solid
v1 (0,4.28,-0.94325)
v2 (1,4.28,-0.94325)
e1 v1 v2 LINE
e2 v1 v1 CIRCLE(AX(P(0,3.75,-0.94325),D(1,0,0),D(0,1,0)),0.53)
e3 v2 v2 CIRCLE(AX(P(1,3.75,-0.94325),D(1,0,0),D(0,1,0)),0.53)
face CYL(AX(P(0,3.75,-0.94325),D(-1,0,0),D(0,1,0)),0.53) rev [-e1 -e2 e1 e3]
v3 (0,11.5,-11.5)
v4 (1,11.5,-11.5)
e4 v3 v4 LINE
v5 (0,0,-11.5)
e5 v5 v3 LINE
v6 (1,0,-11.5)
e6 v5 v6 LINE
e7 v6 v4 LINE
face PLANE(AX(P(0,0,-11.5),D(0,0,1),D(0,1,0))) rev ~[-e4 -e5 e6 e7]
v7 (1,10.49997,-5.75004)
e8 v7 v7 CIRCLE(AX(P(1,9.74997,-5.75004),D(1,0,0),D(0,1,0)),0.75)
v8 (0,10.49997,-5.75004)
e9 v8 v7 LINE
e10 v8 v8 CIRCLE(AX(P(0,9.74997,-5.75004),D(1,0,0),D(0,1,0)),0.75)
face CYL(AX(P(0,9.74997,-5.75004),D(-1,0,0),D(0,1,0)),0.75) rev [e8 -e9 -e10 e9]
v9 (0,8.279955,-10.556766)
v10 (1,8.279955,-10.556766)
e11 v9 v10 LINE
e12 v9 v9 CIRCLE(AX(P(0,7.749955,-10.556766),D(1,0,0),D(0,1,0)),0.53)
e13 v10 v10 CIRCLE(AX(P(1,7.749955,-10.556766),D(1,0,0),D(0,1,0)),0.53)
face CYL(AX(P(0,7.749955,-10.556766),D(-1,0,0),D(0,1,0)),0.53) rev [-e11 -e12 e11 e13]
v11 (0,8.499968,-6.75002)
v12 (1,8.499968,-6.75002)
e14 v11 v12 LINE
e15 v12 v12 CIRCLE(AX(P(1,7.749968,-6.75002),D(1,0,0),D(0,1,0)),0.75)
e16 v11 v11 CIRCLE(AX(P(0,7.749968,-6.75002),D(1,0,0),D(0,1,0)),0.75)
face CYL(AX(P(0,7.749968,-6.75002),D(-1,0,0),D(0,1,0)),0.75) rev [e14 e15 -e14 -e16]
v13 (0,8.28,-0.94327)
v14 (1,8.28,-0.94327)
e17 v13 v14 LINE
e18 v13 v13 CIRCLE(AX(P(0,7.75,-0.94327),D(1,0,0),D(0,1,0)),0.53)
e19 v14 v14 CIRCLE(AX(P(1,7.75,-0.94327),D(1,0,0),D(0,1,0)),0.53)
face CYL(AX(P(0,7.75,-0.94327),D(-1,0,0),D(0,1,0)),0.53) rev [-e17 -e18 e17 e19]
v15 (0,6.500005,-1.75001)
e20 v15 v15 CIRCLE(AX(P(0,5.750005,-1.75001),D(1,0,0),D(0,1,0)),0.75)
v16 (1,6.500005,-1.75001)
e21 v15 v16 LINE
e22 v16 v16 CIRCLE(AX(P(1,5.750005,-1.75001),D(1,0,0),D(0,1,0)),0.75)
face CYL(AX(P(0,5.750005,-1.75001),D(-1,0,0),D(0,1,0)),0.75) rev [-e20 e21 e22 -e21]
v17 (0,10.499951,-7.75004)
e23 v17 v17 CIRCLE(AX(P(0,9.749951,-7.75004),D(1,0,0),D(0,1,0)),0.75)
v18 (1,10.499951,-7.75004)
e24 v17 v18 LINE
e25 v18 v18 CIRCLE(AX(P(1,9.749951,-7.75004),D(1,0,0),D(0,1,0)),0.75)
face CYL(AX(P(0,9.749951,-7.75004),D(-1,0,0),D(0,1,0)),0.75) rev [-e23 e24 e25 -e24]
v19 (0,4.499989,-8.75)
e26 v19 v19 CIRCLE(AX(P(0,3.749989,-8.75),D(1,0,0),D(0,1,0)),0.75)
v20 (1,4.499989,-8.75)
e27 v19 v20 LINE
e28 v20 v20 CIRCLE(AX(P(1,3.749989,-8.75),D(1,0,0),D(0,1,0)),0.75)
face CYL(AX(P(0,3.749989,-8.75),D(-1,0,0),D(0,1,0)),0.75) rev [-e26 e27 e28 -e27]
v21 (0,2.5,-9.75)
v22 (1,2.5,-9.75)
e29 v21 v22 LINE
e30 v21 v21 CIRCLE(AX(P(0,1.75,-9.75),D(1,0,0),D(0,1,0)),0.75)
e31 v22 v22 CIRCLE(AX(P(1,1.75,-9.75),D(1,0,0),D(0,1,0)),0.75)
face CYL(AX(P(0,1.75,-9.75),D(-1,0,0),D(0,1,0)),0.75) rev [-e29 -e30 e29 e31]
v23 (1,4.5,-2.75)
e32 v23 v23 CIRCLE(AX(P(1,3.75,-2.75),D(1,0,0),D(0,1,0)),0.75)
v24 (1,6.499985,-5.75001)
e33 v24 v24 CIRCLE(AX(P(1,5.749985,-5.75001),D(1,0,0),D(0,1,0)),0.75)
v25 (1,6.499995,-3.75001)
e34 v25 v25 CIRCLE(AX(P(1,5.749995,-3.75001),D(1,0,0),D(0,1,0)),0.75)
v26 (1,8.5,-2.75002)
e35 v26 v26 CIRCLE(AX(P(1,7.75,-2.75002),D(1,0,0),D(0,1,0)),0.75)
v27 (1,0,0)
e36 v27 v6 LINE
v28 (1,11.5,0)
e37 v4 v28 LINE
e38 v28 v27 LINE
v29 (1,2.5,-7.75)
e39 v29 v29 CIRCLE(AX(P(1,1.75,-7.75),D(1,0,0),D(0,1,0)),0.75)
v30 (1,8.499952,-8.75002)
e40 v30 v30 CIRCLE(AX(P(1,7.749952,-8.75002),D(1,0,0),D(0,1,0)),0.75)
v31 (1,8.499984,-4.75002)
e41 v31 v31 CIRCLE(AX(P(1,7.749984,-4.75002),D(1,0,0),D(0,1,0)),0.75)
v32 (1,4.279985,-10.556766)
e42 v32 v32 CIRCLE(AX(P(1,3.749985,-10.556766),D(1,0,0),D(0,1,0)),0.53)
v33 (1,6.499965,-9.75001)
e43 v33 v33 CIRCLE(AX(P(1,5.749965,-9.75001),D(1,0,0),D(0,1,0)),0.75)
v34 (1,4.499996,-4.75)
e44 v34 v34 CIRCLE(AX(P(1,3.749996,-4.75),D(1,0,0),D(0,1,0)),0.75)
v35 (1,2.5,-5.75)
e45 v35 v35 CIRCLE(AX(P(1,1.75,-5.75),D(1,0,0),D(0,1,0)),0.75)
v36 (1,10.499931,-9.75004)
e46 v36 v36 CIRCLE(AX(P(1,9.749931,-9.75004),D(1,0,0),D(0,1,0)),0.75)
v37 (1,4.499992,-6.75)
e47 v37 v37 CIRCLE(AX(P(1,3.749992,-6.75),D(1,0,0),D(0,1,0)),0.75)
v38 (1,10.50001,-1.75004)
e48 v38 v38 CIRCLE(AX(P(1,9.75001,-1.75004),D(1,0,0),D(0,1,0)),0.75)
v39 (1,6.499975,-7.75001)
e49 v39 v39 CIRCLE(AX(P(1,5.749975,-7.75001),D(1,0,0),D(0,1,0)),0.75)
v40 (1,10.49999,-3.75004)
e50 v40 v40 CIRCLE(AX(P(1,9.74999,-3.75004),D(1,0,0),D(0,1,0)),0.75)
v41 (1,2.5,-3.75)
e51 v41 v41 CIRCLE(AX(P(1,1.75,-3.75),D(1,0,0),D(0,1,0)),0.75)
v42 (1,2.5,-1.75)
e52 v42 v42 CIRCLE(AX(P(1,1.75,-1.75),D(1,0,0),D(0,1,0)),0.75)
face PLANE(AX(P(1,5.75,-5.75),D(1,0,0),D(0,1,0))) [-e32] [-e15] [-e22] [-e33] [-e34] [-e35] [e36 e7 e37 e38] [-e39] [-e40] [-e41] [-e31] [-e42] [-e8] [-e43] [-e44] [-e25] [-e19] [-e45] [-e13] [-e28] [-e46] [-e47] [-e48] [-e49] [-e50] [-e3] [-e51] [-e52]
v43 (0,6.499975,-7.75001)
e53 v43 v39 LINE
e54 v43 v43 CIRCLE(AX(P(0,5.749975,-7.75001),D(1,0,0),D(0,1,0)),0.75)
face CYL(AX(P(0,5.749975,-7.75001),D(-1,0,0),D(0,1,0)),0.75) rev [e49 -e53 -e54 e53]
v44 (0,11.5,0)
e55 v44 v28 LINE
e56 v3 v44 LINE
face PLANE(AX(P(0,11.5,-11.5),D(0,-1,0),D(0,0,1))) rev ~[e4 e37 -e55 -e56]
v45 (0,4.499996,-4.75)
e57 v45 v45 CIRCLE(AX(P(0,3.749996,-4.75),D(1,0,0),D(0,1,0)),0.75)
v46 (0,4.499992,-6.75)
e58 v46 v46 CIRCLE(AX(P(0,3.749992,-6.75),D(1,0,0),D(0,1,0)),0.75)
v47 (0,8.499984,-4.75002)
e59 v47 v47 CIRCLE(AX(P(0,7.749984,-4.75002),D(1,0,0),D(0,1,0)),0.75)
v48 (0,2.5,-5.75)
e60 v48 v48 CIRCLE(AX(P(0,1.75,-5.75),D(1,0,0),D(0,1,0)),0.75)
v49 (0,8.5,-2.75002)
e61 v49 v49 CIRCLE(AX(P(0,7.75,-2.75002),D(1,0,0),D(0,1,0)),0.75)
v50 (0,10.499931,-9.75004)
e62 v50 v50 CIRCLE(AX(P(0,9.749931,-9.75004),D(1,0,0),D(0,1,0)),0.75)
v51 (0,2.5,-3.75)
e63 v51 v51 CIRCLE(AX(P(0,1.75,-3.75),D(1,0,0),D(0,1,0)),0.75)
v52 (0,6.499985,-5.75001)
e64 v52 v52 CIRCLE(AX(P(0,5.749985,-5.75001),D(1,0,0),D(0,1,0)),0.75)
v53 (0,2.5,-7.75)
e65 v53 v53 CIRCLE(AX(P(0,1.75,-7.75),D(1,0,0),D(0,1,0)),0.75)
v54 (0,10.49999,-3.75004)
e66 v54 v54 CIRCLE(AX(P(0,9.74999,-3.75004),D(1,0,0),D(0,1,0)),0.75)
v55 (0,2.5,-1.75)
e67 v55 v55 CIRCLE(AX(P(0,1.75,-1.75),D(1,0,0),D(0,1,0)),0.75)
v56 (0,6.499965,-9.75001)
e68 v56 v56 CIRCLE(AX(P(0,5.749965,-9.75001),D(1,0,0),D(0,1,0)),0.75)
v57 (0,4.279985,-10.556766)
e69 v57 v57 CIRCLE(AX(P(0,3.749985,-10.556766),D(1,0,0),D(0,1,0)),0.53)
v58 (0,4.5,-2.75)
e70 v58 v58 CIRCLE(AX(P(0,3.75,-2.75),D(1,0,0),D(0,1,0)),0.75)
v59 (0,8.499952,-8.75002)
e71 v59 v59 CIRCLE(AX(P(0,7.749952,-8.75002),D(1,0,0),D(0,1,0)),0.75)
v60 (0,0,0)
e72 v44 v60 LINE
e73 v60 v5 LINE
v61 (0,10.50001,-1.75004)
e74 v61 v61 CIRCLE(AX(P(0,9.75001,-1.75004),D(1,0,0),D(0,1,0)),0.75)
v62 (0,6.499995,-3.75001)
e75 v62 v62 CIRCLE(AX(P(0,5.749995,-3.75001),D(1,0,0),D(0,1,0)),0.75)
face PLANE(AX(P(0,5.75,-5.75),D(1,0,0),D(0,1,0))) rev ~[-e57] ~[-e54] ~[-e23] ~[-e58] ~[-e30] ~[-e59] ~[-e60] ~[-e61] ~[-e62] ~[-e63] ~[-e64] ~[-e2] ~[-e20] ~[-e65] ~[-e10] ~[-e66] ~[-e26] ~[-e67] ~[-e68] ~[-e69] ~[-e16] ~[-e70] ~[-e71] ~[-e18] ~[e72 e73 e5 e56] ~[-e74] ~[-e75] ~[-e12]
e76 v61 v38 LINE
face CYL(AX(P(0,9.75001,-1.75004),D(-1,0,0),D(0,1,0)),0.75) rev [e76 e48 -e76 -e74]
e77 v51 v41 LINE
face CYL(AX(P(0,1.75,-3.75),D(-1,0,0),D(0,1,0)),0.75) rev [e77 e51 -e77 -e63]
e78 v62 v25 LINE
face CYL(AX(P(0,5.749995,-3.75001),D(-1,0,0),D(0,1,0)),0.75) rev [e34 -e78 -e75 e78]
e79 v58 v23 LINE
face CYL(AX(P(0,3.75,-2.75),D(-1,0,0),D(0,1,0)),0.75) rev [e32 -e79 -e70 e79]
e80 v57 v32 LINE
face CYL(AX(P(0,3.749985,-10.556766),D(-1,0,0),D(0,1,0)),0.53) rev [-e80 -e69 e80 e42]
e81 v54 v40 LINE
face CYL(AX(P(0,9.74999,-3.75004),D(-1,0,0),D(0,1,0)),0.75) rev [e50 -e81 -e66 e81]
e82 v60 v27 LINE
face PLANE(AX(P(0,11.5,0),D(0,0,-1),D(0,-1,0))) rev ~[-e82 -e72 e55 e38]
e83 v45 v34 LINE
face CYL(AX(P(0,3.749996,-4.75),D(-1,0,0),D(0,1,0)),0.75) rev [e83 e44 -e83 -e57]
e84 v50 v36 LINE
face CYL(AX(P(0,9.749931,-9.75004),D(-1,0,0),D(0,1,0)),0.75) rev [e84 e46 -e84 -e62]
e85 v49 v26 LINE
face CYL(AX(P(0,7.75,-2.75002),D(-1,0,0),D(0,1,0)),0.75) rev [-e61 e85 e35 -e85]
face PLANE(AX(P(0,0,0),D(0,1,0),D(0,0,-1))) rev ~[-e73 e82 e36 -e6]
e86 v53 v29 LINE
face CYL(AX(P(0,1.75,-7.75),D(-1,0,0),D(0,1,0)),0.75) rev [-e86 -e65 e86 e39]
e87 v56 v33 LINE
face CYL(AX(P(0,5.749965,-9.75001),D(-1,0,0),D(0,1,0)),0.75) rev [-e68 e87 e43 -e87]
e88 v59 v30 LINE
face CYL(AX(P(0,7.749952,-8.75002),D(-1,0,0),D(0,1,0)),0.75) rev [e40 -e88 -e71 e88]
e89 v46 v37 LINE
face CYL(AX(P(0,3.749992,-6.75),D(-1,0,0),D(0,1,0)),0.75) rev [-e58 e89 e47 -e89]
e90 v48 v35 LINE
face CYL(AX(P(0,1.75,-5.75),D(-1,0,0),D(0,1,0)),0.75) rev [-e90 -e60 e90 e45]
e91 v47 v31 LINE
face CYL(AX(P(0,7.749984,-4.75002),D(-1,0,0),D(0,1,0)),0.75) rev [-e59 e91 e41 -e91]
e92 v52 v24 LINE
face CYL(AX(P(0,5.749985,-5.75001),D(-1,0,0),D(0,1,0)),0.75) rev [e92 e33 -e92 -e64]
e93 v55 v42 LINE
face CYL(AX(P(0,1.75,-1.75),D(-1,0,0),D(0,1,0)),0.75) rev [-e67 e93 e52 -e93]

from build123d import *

# Parameters (mm, degrees)
F0_R     = 0.75
F0_R_2   = 0.53
F1_DEPTH = 1


# Not quite as in the source:
# - a feature names something its author has since deleted; it is built from what else it names


with BuildPart() as f1:
    # F0 (on Right) → F1 (new body)
    with BuildSketch(Plane.YZ):
        Polygon((8.384144865, 0), (0, 0), (0, -11.5), (11.5, -11.5), (11.5, 0), (10.384144865, 0), align=None)
        with Locations((1.7500000088, -9.75)):
            Circle(F0_R, mode=Mode.SUBTRACT)
        with Locations((1.75, -7.75)):
            Circle(F0_R, mode=Mode.SUBTRACT)
        with Locations((3.7499851588, -10.5567658602)):
            Circle(F0_R_2, mode=Mode.SUBTRACT)
        with Locations((5.7499653617, -9.750009894)):
            Circle(F0_R, mode=Mode.SUBTRACT)
        with Locations((3.7499885936, -8.7499999912)):
            Circle(F0_R, mode=Mode.SUBTRACT)
        with Locations((3.7499923957, -6.75)):
            Circle(F0_R, mode=Mode.SUBTRACT)
        with Locations((5.7499752647, -7.7500098941)):
            Circle(F0_R, mode=Mode.SUBTRACT)
        with Locations((1.75, -5.75)):
            Circle(F0_R, mode=Mode.SUBTRACT)
        with Locations((1.75, -3.75)):
            Circle(F0_R, mode=Mode.SUBTRACT)
        with Locations((1.75, -1.75)):
            Circle(F0_R, mode=Mode.SUBTRACT)
        with Locations((3.7499961979, -4.75)):
            Circle(F0_R, mode=Mode.SUBTRACT)
        with Locations((5.7499851588, -5.7500098941)):
            Circle(F0_R, mode=Mode.SUBTRACT)
        with Locations((5.7499950529, -3.7500098941)):
            Circle(F0_R, mode=Mode.SUBTRACT)
        with Locations((3.75, -2.75)):
            Circle(F0_R, mode=Mode.SUBTRACT)
        with Locations((3.75, -0.94325)):
            Circle(F0_R_2, mode=Mode.SUBTRACT)
        with Locations((7.749955461, -10.5567658602)):
            Circle(F0_R_2, mode=Mode.SUBTRACT)
        with Locations((7.7499520262, -8.7500197836)):
            Circle(F0_R, mode=Mode.SUBTRACT)
        with Locations((7.7499680167, -6.7500197925)):
            Circle(F0_R, mode=Mode.SUBTRACT)
        with Locations((9.7499307145, -9.750039585)):
            Circle(F0_R, mode=Mode.SUBTRACT)
        with Locations((9.749950516, -7.7500395851)):
            Circle(F0_R, mode=Mode.SUBTRACT)
        with Locations((7.7499840072, -4.7500197926)):
            Circle(F0_R, mode=Mode.SUBTRACT)
        with Locations((5.750004947, -1.7500098941)):
            Circle(F0_R, mode=Mode.SUBTRACT)
        with Locations((7.7499999977, -2.7500197927)):
            Circle(F0_R, mode=Mode.SUBTRACT)
        with Locations((7.7499999977, -0.9432697927)):
            Circle(F0_R_2, mode=Mode.SUBTRACT)
        with Locations((9.7499703087, -5.7500395852)):
            Circle(F0_R, mode=Mode.SUBTRACT)
        with Locations((9.7499901013, -3.7500395853)):
            Circle(F0_R, mode=Mode.SUBTRACT)
        with Locations((9.750009894, -1.7500395854)):
            Circle(F0_R, mode=Mode.SUBTRACT)
    extrude(amount=F1_DEPTH)


solid = f1.part
